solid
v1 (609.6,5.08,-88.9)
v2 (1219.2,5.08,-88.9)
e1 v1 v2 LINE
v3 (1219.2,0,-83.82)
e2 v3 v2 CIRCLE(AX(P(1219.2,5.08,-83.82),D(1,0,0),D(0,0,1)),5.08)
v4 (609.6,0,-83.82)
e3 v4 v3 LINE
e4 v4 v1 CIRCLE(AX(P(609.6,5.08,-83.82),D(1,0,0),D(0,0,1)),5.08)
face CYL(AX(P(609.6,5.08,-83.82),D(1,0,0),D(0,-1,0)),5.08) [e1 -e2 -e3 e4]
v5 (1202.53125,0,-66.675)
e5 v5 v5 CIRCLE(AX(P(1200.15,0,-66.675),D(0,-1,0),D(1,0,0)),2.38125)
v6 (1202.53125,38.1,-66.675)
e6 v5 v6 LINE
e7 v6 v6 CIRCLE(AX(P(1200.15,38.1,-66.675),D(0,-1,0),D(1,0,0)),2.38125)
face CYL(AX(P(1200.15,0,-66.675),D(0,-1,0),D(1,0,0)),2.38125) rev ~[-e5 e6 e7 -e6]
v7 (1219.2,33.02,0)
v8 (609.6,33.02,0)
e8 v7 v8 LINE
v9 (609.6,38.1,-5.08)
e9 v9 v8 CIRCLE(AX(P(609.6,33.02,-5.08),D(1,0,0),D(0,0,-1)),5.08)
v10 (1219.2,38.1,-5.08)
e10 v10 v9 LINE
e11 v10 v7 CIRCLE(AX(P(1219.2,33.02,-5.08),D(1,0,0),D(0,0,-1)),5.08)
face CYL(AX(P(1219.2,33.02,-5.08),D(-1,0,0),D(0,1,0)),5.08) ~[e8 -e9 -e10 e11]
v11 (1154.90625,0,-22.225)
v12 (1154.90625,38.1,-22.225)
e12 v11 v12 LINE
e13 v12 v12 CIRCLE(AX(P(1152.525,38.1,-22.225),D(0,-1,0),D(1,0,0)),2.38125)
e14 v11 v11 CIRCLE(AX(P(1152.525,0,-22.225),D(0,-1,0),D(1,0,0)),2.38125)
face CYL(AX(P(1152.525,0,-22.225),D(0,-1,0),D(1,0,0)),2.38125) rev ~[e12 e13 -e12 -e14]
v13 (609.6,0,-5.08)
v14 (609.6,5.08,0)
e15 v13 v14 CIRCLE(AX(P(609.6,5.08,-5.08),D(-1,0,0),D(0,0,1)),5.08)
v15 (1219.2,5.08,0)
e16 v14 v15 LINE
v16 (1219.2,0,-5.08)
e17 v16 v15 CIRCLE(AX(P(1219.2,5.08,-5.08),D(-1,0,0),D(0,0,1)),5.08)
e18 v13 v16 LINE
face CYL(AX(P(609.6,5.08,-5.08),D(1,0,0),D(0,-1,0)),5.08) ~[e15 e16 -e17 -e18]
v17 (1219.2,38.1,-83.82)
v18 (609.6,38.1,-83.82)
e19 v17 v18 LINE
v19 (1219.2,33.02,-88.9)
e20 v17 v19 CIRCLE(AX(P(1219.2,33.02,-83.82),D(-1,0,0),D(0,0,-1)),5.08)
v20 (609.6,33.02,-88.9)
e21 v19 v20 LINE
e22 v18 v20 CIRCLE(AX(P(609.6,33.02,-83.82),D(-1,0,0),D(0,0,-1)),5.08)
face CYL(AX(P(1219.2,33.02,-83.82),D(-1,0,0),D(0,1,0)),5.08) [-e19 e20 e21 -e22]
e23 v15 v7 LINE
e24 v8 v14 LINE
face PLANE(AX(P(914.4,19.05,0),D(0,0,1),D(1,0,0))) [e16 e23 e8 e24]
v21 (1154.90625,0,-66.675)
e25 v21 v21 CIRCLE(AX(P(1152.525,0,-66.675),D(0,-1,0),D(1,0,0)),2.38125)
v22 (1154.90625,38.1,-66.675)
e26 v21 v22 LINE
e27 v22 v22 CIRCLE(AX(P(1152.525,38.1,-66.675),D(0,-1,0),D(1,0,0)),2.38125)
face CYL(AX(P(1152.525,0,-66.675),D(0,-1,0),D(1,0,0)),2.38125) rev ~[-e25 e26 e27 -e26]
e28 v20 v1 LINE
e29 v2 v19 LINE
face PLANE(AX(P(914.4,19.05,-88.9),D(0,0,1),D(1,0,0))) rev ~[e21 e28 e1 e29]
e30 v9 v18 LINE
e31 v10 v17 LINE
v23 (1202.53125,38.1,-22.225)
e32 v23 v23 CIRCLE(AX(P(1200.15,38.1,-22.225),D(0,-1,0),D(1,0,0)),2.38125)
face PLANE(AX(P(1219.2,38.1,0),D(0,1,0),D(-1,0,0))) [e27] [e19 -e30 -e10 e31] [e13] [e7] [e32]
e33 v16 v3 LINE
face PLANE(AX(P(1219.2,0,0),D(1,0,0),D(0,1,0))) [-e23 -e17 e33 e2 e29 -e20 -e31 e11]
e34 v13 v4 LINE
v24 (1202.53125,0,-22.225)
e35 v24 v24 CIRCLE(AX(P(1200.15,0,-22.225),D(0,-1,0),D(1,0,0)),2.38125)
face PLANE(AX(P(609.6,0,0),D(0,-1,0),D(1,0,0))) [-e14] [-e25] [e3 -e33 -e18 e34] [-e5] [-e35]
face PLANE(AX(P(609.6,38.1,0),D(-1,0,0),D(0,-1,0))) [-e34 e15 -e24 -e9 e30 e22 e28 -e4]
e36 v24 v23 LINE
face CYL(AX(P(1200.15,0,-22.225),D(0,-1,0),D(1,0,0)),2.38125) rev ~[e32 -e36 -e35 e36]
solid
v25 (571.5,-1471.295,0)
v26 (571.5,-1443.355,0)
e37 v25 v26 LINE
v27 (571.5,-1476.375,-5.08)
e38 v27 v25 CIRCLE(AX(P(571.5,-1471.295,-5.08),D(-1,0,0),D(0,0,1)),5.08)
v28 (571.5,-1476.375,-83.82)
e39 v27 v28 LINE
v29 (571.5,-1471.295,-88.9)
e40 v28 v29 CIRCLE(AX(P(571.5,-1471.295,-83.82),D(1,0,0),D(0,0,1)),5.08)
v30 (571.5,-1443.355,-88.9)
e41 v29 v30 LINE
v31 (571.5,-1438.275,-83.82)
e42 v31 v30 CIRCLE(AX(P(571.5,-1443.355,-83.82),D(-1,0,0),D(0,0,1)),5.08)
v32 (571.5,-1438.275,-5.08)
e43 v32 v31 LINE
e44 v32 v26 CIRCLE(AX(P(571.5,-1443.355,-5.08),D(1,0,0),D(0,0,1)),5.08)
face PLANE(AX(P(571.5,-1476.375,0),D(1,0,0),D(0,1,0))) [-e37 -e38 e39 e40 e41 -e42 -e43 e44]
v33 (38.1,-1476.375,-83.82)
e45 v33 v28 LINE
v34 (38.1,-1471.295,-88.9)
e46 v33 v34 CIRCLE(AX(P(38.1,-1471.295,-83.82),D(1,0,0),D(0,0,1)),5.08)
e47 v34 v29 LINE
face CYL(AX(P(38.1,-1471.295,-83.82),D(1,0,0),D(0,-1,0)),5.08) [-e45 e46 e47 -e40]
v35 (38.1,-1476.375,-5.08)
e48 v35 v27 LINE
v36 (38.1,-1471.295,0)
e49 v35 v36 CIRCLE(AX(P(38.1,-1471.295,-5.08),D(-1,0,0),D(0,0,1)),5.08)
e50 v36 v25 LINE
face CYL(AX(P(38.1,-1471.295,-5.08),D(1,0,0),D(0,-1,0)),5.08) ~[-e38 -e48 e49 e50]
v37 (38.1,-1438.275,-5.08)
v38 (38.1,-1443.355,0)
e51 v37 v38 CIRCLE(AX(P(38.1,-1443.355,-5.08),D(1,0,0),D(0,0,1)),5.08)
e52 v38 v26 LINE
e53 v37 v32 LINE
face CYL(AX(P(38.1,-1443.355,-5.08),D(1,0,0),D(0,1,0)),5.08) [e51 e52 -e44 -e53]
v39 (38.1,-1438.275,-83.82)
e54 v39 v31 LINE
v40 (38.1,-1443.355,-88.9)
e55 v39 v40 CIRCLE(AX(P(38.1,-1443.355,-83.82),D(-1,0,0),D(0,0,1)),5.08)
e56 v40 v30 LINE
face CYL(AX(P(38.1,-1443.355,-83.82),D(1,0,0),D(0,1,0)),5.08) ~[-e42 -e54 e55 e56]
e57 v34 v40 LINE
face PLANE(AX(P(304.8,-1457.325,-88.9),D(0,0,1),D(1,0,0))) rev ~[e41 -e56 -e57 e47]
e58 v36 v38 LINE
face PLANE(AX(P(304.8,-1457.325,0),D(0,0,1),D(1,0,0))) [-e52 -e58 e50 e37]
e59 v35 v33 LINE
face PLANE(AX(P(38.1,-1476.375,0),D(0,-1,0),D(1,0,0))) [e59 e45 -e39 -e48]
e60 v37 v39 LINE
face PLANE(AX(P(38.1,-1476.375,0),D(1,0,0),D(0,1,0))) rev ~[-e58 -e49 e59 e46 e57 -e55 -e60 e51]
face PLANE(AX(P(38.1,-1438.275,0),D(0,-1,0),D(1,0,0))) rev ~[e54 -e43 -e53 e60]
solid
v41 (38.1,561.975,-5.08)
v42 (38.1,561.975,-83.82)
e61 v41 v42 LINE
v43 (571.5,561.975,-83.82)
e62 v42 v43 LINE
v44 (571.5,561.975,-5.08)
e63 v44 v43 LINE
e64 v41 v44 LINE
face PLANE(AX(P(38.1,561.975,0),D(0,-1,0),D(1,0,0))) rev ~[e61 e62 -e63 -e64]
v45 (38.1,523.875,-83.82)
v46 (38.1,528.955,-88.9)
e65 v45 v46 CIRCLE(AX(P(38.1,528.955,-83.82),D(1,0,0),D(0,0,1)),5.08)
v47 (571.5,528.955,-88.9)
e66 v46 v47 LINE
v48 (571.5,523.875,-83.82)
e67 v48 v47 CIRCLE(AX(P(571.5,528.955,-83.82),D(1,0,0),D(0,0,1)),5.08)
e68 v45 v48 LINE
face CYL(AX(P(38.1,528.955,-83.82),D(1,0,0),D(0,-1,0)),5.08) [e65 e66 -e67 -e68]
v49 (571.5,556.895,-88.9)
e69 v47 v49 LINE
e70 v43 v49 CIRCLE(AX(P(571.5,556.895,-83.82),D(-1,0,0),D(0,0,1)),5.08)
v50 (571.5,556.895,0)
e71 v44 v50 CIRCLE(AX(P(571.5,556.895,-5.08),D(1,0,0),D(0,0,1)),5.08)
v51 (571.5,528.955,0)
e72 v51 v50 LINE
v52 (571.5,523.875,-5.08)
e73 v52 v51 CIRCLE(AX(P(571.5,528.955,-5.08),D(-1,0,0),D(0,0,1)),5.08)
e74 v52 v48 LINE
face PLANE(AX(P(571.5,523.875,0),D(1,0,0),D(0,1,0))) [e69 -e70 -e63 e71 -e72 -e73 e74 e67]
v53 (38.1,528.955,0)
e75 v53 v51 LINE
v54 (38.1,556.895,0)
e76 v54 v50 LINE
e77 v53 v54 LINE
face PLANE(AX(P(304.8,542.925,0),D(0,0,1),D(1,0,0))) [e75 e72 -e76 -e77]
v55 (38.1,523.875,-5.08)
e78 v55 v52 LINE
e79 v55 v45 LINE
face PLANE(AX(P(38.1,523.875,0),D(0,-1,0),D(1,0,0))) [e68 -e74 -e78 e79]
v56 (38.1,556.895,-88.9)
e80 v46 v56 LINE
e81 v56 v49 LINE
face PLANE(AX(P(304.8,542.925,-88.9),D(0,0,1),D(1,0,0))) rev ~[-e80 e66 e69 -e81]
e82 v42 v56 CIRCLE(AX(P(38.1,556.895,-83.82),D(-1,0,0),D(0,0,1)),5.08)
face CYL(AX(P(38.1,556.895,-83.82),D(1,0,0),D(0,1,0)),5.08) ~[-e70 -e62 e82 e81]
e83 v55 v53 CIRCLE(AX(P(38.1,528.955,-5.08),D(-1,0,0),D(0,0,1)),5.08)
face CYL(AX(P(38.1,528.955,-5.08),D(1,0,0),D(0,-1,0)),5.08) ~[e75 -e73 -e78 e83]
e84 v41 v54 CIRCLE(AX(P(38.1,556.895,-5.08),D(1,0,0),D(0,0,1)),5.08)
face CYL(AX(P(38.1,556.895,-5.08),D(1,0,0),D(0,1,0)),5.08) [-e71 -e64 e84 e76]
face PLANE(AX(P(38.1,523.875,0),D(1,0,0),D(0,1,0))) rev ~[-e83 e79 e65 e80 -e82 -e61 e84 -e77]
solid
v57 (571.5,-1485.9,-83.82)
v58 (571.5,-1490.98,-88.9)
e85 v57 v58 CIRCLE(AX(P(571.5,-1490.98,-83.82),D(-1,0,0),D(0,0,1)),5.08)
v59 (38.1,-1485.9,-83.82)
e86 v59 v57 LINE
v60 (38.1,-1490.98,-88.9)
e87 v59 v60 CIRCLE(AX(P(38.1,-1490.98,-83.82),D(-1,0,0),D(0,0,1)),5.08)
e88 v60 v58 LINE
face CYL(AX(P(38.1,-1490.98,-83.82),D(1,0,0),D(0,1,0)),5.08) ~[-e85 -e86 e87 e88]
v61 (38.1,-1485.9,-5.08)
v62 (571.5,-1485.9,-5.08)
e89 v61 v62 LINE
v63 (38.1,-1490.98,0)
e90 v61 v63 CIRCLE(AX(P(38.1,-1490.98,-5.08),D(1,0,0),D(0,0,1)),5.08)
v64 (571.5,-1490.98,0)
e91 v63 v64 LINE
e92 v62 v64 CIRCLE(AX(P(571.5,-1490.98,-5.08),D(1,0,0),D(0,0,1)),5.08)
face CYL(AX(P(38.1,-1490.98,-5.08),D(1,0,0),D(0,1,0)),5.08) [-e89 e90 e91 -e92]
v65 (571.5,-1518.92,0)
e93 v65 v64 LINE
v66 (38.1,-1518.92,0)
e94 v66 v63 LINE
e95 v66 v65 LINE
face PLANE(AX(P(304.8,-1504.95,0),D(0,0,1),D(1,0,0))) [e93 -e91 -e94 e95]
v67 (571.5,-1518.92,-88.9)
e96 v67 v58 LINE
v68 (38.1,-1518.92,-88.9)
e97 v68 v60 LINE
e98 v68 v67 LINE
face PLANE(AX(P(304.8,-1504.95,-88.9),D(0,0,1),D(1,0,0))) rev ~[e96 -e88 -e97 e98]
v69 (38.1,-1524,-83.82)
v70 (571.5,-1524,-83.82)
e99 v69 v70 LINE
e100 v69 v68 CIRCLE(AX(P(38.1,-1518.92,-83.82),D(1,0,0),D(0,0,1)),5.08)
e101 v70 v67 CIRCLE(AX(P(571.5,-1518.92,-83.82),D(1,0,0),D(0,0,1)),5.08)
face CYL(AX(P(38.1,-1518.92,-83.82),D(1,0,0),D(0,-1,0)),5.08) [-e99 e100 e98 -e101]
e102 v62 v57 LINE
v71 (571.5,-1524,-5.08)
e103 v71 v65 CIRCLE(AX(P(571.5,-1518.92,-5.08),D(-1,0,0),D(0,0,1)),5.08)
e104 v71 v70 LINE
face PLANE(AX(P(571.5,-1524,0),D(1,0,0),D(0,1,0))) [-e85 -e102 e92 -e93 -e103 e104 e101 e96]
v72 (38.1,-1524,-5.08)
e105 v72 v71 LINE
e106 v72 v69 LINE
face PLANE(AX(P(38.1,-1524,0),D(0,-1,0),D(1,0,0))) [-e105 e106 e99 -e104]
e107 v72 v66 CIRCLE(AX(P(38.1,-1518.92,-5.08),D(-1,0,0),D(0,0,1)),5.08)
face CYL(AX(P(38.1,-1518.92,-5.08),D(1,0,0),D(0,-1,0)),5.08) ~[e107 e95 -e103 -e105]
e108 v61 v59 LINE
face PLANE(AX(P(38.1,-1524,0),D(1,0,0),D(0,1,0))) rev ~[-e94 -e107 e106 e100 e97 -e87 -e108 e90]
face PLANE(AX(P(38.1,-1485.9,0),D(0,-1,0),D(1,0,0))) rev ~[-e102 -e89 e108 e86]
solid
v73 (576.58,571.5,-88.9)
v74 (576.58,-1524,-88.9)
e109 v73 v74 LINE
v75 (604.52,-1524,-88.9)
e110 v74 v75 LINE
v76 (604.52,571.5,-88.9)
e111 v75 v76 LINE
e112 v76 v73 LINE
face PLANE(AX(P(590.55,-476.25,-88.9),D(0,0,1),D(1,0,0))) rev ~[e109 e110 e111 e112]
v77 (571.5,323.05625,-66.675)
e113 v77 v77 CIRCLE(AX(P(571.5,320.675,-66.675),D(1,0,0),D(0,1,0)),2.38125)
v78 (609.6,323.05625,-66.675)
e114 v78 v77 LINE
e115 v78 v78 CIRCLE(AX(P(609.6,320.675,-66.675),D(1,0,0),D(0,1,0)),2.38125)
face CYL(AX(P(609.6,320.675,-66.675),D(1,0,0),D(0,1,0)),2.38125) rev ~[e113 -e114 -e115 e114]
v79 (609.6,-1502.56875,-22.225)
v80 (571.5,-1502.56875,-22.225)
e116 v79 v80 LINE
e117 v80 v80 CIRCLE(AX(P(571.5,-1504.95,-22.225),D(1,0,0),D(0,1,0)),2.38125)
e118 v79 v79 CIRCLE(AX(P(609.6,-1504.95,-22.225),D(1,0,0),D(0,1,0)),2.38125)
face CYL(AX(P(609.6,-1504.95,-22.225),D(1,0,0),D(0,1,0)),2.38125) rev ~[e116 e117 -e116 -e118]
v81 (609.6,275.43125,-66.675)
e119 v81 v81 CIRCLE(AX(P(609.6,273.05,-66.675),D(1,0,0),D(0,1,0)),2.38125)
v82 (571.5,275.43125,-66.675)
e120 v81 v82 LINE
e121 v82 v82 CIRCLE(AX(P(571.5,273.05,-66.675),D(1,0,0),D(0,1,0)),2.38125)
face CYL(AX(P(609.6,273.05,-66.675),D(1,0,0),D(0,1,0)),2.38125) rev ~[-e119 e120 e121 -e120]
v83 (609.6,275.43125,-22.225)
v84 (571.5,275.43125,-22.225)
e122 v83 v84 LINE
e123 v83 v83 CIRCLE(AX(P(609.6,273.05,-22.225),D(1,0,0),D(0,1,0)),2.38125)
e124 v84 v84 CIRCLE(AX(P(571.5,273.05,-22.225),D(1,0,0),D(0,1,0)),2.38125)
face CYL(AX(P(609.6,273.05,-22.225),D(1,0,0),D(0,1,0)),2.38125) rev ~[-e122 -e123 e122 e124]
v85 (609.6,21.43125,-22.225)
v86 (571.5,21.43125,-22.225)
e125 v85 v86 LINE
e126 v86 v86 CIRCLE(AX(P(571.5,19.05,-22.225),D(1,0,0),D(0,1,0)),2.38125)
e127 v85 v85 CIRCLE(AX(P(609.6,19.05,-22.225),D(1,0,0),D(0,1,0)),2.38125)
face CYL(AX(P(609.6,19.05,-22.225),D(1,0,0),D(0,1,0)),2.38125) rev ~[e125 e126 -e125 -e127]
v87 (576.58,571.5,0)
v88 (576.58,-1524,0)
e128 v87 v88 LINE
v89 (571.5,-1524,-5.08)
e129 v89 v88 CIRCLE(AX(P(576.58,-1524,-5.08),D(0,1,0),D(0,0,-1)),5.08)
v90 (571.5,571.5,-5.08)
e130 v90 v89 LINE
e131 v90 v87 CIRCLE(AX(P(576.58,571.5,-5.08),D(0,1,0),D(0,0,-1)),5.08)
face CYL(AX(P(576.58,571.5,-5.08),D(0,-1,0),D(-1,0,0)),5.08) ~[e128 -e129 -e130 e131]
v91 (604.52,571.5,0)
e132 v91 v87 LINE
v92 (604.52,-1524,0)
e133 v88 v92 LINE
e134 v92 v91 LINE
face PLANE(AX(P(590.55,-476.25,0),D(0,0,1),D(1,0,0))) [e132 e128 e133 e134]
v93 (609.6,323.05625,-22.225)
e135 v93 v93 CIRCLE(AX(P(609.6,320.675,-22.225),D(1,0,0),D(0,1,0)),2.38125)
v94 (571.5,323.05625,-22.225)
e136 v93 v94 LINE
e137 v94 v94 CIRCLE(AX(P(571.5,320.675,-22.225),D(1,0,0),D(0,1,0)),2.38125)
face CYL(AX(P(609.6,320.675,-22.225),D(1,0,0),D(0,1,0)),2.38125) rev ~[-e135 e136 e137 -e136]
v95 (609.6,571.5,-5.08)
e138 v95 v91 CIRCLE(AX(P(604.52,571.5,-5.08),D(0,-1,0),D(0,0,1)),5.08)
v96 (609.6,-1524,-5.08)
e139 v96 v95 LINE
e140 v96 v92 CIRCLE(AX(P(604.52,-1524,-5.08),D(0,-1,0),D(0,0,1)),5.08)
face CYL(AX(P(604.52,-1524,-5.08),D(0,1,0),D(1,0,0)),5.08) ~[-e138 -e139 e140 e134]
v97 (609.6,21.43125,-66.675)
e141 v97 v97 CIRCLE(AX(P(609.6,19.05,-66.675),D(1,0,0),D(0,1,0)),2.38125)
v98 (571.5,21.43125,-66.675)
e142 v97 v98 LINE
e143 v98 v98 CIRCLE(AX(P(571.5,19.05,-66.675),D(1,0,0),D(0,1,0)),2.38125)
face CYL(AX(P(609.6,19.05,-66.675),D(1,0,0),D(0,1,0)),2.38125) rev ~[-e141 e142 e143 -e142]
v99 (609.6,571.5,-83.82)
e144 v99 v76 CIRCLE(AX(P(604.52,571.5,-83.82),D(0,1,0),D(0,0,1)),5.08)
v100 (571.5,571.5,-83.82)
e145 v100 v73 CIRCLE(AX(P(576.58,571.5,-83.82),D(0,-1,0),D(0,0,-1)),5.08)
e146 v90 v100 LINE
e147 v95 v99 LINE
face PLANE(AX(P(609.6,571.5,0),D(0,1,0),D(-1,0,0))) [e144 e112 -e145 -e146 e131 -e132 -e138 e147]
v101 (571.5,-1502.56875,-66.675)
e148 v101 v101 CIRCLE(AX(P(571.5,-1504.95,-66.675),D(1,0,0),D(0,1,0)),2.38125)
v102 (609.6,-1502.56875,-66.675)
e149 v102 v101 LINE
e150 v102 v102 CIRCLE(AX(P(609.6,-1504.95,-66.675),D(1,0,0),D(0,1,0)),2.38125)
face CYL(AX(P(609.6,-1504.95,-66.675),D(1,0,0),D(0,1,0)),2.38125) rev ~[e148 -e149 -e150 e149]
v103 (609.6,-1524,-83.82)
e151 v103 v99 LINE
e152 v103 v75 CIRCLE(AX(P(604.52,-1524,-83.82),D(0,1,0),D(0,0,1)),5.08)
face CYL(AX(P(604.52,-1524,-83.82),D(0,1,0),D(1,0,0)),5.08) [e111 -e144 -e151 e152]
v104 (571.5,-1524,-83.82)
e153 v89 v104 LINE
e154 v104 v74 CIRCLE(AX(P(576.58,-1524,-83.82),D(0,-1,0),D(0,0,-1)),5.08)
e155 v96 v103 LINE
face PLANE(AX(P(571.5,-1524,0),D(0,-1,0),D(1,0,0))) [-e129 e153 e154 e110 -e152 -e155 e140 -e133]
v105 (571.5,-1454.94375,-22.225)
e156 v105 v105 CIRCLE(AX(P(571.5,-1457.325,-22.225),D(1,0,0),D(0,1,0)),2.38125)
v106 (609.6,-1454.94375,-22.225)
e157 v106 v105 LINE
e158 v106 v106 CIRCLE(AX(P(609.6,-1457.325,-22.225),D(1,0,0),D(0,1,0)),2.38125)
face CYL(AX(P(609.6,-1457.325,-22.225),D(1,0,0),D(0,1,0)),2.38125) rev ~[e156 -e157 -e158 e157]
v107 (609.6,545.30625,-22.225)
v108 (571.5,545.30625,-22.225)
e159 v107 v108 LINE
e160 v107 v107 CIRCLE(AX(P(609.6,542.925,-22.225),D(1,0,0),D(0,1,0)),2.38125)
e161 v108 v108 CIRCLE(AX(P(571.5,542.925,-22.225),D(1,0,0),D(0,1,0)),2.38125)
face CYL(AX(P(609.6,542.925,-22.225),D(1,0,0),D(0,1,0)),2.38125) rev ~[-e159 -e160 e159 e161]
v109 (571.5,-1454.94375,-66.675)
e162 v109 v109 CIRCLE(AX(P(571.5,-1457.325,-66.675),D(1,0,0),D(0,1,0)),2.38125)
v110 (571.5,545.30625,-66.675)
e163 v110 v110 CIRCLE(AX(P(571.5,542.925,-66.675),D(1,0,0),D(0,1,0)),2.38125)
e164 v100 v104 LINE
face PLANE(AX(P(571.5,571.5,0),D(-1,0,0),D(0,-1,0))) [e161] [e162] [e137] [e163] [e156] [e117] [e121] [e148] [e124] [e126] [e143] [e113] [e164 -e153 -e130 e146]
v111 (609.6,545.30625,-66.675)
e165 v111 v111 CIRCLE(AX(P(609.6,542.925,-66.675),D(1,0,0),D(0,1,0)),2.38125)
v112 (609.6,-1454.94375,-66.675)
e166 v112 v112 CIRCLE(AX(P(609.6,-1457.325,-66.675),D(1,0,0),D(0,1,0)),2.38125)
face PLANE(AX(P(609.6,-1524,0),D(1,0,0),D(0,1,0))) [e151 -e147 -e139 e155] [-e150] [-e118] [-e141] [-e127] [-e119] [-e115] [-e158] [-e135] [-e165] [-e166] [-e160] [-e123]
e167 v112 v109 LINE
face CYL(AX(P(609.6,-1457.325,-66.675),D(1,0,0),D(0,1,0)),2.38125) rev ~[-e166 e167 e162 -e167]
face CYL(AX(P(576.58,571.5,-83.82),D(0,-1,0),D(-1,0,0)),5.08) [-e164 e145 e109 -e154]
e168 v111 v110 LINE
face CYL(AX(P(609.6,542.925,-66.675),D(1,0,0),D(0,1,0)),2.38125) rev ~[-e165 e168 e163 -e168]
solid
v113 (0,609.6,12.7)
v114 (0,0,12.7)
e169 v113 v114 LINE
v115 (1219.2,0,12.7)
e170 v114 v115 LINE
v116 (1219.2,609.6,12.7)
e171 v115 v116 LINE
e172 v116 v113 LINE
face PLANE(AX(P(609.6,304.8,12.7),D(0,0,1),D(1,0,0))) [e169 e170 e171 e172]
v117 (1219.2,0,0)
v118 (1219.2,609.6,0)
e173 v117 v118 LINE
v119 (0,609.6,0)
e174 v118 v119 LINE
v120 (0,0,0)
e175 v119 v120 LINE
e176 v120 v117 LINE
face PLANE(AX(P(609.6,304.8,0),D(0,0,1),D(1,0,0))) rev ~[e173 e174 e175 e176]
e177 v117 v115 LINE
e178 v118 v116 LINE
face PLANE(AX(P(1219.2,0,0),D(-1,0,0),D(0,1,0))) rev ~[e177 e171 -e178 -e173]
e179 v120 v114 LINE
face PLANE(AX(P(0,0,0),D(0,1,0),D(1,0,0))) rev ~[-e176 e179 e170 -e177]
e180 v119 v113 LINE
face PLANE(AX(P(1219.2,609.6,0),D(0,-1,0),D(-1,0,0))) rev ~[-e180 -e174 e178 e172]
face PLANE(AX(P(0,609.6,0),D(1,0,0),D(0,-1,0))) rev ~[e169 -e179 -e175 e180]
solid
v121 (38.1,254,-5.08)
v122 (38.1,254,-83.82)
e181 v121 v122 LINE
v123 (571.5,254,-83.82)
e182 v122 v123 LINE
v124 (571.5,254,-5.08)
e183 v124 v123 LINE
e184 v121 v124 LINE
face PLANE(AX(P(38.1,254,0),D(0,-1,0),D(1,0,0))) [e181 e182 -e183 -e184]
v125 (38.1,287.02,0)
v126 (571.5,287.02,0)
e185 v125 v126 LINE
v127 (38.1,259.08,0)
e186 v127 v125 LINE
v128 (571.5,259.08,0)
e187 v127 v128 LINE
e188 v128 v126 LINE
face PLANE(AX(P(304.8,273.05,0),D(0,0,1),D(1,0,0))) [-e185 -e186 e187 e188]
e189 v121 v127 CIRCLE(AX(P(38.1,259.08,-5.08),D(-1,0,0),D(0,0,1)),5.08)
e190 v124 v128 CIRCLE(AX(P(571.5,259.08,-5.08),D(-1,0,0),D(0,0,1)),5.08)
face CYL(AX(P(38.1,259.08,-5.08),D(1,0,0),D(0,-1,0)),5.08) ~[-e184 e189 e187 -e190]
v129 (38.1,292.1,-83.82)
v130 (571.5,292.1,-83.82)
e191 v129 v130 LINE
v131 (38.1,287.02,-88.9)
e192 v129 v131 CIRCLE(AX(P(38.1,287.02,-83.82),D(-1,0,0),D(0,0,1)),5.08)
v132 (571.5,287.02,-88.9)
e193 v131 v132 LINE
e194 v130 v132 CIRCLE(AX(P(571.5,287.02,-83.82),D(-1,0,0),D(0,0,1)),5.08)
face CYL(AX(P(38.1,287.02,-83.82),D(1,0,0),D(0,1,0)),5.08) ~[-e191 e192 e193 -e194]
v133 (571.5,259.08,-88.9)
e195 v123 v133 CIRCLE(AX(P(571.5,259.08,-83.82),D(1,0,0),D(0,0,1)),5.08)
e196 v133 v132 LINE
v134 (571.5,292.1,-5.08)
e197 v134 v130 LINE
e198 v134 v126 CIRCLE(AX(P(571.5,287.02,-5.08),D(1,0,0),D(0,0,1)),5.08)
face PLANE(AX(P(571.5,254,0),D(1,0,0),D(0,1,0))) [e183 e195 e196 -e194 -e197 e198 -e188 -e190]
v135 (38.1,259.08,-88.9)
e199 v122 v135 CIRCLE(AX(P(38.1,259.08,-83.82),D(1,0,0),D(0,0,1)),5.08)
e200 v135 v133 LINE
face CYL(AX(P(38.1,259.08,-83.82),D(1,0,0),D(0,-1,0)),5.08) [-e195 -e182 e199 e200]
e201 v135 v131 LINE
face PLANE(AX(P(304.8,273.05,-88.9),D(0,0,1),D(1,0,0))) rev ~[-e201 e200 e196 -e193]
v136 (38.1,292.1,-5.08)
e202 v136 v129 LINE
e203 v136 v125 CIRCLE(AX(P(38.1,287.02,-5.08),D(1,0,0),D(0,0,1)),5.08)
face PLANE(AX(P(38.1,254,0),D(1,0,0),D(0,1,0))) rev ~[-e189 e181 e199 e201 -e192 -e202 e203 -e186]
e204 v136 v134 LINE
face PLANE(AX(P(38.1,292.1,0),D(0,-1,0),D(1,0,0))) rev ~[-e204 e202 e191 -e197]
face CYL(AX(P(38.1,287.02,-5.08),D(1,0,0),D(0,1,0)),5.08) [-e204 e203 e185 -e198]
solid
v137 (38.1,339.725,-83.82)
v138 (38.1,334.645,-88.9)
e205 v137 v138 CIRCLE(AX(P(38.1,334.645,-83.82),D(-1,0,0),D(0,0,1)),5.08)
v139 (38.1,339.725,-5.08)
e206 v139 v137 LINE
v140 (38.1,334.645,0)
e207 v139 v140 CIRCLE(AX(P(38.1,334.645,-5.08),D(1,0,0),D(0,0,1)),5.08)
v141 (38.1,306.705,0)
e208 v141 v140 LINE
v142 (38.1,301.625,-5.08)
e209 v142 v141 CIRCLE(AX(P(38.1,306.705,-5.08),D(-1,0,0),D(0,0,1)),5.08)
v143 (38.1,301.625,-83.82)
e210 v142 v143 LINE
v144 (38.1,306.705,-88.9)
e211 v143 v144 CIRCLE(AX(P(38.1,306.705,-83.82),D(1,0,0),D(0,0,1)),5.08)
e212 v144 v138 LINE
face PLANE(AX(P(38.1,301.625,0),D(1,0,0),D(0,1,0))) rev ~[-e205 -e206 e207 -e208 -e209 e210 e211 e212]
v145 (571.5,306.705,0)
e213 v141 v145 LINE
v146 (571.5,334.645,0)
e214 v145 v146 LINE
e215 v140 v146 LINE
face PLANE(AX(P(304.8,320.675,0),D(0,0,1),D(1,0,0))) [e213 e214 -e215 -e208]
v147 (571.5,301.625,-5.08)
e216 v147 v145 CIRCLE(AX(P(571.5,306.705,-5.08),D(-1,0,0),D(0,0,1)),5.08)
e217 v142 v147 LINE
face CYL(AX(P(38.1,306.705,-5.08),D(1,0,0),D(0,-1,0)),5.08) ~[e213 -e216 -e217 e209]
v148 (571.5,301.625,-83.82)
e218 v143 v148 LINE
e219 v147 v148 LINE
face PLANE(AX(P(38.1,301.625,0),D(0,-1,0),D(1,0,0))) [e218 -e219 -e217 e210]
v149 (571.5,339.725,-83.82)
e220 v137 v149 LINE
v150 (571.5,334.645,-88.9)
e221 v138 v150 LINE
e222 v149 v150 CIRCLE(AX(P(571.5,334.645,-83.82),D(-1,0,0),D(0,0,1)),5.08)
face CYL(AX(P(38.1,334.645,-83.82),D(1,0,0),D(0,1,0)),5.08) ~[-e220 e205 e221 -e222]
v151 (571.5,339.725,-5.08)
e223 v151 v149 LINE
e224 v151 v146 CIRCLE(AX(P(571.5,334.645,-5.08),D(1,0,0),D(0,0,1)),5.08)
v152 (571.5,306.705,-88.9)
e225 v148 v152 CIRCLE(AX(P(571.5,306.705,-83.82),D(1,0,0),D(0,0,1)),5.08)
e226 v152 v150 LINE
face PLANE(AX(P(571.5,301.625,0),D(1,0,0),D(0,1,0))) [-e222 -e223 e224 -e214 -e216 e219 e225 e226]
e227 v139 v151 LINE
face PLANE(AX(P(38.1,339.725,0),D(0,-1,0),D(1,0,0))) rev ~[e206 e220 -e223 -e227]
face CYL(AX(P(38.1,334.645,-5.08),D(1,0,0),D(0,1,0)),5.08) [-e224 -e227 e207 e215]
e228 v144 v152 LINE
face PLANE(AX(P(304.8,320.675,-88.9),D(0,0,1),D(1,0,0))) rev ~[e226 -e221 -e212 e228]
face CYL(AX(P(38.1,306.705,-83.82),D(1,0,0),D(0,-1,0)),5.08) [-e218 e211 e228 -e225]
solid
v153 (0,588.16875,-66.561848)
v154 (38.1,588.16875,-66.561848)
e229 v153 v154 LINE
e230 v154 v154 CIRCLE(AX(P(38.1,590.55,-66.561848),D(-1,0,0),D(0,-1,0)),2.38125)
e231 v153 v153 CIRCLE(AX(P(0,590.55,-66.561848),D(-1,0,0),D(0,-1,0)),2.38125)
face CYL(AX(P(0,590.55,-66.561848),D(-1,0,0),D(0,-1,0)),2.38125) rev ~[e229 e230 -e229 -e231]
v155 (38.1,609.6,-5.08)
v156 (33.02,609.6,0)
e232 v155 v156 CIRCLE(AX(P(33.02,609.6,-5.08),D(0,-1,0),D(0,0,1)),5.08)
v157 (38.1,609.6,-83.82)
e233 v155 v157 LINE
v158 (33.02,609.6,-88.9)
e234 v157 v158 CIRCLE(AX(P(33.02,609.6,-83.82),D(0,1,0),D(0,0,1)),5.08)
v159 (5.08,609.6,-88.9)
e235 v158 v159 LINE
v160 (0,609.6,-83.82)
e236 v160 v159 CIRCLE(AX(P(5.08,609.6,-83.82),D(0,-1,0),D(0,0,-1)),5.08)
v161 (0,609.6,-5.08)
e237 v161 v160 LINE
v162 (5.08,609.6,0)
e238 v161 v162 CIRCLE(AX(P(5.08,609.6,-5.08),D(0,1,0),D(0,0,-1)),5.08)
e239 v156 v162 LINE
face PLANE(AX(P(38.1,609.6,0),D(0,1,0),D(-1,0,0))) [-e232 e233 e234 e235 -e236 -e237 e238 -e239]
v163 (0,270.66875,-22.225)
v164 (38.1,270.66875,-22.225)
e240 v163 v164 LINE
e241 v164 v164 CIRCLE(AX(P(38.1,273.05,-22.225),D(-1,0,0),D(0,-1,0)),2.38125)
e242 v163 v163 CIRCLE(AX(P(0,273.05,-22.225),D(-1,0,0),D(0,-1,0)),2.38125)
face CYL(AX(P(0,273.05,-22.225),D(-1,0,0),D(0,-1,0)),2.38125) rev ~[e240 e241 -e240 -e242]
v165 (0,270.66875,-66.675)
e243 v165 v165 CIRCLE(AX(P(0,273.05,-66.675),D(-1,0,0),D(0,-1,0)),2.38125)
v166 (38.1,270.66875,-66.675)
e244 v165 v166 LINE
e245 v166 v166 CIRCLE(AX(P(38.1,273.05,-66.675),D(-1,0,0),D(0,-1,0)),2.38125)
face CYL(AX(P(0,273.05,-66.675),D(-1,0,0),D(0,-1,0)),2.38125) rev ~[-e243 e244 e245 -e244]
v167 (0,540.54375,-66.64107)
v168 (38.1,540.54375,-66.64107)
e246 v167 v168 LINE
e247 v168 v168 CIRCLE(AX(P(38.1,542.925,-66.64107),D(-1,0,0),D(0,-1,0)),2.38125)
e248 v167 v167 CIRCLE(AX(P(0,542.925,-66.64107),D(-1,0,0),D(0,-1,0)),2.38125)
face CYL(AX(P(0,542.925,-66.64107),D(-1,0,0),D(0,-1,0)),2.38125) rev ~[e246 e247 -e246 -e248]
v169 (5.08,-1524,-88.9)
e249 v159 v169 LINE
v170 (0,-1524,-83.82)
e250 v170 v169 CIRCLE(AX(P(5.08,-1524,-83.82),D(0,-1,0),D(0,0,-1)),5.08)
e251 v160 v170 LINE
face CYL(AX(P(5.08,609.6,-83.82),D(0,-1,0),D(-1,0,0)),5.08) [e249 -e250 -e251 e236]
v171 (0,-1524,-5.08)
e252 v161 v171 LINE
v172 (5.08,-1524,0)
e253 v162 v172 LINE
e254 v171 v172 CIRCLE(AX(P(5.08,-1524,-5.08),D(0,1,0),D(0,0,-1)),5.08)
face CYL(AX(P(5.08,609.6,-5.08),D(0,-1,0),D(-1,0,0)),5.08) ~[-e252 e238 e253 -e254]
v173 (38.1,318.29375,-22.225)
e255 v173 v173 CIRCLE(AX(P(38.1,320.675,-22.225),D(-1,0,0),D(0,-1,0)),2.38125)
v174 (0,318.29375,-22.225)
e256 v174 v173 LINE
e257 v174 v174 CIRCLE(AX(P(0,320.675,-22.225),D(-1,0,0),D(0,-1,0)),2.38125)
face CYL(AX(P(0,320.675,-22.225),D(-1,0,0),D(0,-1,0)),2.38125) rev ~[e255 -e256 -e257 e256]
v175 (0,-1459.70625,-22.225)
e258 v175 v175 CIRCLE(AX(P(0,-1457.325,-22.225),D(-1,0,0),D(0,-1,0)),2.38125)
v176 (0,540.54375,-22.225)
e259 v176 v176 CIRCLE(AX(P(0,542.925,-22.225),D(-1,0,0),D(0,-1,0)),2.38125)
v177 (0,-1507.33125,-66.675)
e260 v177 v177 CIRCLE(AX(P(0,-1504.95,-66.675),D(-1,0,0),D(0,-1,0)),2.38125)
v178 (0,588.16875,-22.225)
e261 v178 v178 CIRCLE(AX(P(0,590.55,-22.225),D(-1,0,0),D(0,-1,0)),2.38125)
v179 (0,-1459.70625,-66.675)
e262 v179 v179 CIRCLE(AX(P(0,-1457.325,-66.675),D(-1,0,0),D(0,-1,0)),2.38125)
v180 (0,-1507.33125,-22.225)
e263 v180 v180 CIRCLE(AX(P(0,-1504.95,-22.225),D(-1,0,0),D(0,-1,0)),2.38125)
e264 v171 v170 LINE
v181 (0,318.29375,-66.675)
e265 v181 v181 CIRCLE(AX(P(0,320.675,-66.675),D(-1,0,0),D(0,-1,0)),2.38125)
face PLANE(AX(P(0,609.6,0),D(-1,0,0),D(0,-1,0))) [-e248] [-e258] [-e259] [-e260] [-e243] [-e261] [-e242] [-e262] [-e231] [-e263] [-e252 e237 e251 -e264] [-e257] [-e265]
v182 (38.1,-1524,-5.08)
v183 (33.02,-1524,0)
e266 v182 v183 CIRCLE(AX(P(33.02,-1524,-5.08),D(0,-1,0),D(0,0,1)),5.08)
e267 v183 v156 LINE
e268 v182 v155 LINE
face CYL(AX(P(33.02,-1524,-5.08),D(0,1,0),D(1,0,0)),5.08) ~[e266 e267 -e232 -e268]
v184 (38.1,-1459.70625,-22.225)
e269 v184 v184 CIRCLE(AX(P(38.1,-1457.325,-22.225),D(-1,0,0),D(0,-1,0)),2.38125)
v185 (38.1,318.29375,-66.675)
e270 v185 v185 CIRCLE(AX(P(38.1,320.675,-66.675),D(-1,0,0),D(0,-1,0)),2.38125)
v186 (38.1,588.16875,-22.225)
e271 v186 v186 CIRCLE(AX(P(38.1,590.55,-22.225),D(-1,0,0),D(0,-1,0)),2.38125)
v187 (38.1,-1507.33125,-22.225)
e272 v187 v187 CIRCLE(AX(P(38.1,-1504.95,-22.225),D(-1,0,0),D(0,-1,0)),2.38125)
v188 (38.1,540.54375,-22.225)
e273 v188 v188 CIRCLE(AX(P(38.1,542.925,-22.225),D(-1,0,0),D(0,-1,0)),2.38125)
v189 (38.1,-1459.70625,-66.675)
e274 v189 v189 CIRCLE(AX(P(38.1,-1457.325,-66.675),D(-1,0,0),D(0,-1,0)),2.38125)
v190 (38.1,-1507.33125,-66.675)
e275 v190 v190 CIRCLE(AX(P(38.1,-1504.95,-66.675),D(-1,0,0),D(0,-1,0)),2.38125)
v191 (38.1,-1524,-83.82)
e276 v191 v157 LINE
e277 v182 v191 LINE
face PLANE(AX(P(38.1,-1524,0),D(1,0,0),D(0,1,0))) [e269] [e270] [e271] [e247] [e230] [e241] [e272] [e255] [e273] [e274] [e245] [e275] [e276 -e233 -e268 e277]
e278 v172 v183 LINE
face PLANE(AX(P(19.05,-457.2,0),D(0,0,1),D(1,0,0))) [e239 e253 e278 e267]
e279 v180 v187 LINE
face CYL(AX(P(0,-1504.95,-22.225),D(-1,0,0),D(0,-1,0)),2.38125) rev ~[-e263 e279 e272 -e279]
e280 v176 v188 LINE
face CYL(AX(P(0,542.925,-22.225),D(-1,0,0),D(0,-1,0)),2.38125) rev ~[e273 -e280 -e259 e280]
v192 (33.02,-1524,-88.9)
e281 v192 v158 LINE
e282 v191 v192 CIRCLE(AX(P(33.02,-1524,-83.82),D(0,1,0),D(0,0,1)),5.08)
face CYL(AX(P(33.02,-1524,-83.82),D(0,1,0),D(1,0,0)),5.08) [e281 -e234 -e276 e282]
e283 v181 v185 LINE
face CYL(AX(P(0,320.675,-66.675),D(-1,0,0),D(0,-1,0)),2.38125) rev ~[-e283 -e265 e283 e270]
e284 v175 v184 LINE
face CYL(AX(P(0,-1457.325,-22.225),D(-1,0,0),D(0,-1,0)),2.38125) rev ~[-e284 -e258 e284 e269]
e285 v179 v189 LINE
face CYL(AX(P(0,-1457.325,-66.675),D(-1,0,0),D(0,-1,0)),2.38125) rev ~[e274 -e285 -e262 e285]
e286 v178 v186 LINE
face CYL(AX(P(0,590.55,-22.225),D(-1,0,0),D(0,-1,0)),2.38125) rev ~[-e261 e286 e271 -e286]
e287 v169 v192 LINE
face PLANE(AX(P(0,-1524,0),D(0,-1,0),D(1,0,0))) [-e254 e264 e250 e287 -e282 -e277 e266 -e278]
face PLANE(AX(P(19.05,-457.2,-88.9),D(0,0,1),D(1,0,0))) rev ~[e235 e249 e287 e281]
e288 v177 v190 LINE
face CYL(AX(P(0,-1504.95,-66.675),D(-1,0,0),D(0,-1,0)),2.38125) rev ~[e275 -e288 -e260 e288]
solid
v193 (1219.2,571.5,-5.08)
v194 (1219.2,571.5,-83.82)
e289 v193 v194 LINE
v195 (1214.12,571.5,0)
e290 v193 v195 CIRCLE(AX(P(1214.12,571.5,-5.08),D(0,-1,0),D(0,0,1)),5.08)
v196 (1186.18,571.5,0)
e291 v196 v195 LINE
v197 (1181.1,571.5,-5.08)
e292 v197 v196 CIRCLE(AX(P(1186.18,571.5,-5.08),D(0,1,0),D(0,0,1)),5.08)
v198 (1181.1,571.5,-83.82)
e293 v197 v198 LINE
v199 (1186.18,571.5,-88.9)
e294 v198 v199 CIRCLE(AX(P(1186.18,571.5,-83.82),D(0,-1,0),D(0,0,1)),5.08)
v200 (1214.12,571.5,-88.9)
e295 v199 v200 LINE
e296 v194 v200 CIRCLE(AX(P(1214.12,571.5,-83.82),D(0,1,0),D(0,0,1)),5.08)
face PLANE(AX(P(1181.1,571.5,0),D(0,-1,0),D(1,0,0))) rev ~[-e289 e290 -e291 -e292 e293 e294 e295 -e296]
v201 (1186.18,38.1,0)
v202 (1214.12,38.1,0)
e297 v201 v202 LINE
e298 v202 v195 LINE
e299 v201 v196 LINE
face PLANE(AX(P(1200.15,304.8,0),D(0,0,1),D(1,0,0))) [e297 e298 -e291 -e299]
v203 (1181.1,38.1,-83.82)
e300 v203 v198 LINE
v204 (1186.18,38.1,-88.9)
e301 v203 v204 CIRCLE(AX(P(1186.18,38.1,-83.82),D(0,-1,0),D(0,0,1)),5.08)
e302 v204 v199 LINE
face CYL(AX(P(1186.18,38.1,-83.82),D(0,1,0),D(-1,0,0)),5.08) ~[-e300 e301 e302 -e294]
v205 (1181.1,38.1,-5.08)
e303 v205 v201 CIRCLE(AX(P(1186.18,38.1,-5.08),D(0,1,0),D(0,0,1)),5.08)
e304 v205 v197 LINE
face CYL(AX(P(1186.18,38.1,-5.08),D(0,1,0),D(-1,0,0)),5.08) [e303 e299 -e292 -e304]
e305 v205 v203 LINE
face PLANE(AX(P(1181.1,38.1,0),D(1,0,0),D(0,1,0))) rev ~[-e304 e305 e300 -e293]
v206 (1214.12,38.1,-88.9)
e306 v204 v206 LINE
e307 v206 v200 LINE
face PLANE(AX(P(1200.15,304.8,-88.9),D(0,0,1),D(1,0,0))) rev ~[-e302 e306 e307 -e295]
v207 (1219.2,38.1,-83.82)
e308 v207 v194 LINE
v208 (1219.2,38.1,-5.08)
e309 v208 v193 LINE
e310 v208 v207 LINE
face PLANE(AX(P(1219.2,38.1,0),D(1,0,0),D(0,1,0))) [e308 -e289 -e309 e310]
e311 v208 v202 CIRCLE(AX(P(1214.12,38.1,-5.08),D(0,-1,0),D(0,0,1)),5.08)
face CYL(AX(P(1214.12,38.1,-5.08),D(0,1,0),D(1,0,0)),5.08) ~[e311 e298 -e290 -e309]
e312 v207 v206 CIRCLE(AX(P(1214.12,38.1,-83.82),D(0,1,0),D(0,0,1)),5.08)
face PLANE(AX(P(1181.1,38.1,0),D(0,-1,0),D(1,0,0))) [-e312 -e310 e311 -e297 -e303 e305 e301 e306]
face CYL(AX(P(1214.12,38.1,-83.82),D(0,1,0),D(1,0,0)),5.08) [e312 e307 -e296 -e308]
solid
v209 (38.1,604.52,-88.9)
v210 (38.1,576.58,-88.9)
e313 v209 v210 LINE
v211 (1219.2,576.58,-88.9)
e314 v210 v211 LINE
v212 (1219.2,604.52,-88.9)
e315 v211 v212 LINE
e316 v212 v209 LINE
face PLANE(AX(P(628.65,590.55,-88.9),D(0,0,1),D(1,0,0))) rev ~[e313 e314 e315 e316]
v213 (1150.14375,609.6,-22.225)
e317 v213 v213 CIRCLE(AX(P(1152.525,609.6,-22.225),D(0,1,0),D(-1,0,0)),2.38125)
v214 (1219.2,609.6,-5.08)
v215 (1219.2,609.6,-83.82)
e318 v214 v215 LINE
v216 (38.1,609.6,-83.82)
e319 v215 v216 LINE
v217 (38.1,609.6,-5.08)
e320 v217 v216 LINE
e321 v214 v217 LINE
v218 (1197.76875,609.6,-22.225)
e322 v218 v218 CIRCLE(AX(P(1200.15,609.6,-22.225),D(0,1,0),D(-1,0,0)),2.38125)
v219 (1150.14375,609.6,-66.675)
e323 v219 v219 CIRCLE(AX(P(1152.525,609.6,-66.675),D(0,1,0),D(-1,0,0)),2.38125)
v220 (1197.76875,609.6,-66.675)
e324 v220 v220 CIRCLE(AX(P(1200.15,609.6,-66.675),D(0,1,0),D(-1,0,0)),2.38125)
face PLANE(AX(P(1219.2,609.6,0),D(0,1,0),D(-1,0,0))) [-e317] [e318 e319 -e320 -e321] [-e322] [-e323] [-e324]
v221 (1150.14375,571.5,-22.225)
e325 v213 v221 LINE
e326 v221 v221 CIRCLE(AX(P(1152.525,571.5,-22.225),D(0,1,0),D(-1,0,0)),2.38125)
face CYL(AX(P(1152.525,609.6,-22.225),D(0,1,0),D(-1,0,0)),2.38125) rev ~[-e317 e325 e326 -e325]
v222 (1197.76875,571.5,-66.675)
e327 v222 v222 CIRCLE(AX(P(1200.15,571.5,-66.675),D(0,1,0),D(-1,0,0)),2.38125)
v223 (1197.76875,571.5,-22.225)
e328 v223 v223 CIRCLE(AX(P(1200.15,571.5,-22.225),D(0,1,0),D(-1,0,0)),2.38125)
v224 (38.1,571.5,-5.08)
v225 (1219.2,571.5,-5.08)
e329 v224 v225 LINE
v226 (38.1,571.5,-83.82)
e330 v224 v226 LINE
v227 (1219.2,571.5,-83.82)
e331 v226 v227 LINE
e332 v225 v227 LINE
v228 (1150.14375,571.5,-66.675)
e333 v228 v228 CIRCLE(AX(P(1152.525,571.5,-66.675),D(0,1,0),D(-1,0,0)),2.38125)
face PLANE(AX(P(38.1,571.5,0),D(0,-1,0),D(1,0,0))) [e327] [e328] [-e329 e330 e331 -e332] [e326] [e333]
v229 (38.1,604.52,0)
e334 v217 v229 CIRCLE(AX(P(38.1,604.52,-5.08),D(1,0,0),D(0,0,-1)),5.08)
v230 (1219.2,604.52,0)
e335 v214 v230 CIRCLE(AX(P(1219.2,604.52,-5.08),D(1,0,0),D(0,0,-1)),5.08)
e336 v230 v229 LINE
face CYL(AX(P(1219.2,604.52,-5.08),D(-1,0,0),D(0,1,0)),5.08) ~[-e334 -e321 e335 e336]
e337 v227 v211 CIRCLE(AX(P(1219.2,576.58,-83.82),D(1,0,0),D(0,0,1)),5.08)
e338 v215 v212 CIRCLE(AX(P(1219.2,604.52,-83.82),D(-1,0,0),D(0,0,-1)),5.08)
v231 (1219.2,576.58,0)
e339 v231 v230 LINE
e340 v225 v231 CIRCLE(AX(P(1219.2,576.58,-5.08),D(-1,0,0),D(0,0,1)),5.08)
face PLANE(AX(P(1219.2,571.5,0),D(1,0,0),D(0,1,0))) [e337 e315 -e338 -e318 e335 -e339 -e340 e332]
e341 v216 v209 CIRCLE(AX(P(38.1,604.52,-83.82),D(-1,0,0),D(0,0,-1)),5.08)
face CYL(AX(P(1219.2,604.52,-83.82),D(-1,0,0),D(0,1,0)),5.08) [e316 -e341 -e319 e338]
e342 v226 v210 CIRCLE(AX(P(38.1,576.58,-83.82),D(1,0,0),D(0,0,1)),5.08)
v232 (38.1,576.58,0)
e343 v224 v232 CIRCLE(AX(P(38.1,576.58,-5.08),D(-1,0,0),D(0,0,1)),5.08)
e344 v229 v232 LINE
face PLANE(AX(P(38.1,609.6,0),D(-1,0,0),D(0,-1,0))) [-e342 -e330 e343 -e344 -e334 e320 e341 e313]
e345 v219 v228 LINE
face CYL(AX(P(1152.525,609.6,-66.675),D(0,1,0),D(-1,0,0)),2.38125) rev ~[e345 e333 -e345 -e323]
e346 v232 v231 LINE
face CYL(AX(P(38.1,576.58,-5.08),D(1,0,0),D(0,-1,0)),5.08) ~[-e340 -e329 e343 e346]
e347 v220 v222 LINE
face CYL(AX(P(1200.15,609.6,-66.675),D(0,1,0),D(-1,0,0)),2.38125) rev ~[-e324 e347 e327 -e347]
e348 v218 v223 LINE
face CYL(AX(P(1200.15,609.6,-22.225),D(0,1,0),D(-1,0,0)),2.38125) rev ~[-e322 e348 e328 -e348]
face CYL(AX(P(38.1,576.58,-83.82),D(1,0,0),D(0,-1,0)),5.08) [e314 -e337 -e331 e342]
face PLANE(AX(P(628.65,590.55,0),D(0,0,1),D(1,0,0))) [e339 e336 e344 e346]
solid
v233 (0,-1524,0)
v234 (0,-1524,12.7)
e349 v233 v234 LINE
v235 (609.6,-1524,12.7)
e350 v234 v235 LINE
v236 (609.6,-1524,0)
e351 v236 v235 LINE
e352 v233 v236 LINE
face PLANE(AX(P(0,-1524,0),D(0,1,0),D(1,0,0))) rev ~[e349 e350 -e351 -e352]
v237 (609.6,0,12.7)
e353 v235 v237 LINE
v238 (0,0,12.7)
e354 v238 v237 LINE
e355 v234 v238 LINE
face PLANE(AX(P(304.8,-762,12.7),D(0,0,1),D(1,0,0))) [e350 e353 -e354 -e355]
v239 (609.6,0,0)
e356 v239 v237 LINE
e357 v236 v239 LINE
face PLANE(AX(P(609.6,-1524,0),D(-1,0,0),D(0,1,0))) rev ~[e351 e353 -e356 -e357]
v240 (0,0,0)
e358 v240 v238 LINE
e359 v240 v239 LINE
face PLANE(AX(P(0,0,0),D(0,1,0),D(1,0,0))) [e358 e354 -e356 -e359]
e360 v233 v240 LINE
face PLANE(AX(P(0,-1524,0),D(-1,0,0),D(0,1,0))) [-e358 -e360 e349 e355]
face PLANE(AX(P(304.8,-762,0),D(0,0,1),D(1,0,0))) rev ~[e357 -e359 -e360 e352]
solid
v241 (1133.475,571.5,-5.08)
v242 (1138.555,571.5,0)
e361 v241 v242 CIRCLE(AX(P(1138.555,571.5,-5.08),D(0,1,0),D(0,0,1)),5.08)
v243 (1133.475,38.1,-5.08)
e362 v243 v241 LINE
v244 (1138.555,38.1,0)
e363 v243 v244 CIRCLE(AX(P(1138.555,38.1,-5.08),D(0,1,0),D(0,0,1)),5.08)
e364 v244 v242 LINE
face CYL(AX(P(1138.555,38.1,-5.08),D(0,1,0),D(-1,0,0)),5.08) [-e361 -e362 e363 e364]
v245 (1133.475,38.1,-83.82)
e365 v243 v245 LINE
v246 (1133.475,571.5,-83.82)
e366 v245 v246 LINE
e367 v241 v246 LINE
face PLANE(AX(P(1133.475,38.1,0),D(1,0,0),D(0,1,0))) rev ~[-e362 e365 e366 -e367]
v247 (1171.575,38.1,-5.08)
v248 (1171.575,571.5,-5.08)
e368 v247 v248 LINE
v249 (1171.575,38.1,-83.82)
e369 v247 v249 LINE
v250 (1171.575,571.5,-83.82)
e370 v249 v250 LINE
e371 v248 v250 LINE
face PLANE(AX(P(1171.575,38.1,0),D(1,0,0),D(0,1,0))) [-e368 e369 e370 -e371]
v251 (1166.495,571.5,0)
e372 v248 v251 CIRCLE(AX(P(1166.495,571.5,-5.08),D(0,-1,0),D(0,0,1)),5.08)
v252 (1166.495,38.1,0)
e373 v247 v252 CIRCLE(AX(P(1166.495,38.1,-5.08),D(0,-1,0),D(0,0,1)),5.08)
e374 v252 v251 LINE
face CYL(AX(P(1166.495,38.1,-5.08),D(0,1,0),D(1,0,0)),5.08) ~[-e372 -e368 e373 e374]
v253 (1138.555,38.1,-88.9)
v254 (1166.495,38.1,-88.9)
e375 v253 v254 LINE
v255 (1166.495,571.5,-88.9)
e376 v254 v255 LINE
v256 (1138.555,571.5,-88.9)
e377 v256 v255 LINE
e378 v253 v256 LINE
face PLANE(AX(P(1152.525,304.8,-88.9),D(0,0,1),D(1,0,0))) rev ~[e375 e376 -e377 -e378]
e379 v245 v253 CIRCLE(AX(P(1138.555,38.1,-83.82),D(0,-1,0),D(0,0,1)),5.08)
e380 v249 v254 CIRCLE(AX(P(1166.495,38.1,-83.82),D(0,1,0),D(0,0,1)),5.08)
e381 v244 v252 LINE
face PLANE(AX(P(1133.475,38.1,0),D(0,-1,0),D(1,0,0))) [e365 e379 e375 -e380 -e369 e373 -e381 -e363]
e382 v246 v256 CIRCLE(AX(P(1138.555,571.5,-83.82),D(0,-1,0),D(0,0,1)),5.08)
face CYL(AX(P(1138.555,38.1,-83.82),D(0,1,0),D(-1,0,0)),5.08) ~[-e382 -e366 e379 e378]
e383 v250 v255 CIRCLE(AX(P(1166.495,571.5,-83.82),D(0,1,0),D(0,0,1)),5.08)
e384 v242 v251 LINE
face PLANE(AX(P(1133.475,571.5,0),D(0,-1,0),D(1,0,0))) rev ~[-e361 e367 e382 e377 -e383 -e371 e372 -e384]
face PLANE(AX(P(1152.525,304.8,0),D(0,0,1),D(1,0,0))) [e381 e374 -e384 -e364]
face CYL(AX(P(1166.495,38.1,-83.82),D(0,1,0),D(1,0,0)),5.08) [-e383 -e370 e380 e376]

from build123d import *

# Parameters (mm, degrees)
F1_DEPTH  = 12.7
F2_W      = 609.6
F2_H      = 1524
F3_DEPTH  = 12.7
F5_DEPTH  = 88.9
F4_W      = 533.4
F4_H      = 38.1
F6_DEPTH  = 88.9
F7_DEPTH  = 88.9
F8_DEPTH  = 88.9
F9_DEPTH  = 88.9
F10_DEPTH = 88.9
F4_W_2    = 38.1
F4_H_2    = 533.4
F11_DEPTH = 88.9
F12_DEPTH = 88.9
F13_DEPTH = 88.9
F14_DEPTH = 88.9
F15_DEPTH = 88.9
F16_R     = 5.08
F16_2_R   = 5.08
F16_3_R   = 5.08
F16_4_R   = 5.08
F16_5_R   = 5.08
F16_6_R   = 5.08
F16_7_R   = 5.08
F16_8_R   = 5.08
F16_9_R   = 5.08
F16_10_R  = 5.08
F16_11_R  = 5.08
F17_R     = 2.38125
F19_DEPTH = 38.1
F18_R     = 2.38125
F20_DEPTH = 38.1
F21_R     = 2.38125
F22_DEPTH = 38.1
F23_R     = 2.38125
F24_DEPTH = 38.1


with BuildPart() as f1:
    # F0 (on Top) → F1 (new body)
    with BuildSketch(Plane.XY):
        Polygon((0, 609.6), (0, 0), (609.6, 0), (1219.2, 0), (1219.2, 609.6), align=None)
    extrude(amount=F1_DEPTH)


with BuildPart() as f3:
    # F2 (on Top) → F3 (new body)
    with BuildSketch(Plane.XY):
        with Locations((304.8, -762)):
            Rectangle(F2_W, F2_H)
    extrude(amount=F3_DEPTH)


with BuildPart() as f5:
    # F4 (on Top) → F5 (new body)
    with BuildSketch(Plane.XY):
        Polygon((38.1, 571.5), (38.1, 609.6), (0, 609.6), (0, -1524), (38.1, -1524), (38.1, -1485.9), (38.1, -1476.375), (38.1, -1438.275), (38.1, 254), (38.1, 292.1), (38.1, 301.625), (38.1, 339.725), (38.1, 523.875), (38.1, 561.975), align=None)
    extrude(amount=-F5_DEPTH)

    # F16
    f16_edges = [f5.edges().sort_by_distance(p)[0] for p in [
        (0, -457.2, -88.9),
        (38.1, -457.2, -88.9),
        (38.1, -457.2, 0),
        (0, -457.2, 0),
    ]]
    fillet(f16_edges, radius=F16_R)

    # F17 (on face) → F19 (cut)
    with BuildSketch(Plane(origin=(0, 0, 0), x_dir=(0, -1, 0), z_dir=(-1, 0, 0))):
        with Locations((-590.55, -22.225)):
            Circle(F17_R)
        with Locations((-590.55, -66.5618479609)):
            Circle(F17_R)
        with Locations((-542.925, -66.6410699844)):
            Circle(F17_R)
        with Locations((-542.925, -22.225)):
            Circle(F17_R)
        with Locations((-320.675, -22.225)):
            Circle(F17_R)
        with Locations((-320.675, -66.675)):
            Circle(F17_R)
        with Locations((-273.05, -22.225)):
            Circle(F17_R)
        with Locations((-273.05, -66.675)):
            Circle(F17_R)
        with Locations((1457.325, -66.675)):
            Circle(F17_R)
        with Locations((1457.325, -22.225)):
            Circle(F17_R)
        with Locations((1504.95, -22.225)):
            Circle(F17_R)
        with Locations((1504.95, -66.675)):
            Circle(F17_R)
    extrude(amount=-F19_DEPTH, mode=Mode.SUBTRACT)


with BuildPart() as f6:
    # F4 (on Top) → F6 (new body)
    with BuildSketch(Plane.XY):
        with Locations((304.8, -1504.95)):
            Rectangle(F4_W, F4_H)
    extrude(amount=-F6_DEPTH)

    # F16#3
    f16_3_edges = [f6.edges().sort_by_distance(p)[0] for p in [
        (304.8, -1485.9, 0),
        (304.8, -1524, 0),
        (304.8, -1485.9, -88.9),
        (304.8, -1524, -88.9),
    ]]
    fillet(f16_3_edges, radius=F16_3_R)


with BuildPart() as f7:
    # F4 (on Top) → F7 (new body)
    with BuildSketch(Plane.XY):
        Polygon((609.6, 571.5), (571.5, 571.5), (571.5, 561.975), (571.5, 523.875), (571.5, 339.725), (571.5, 301.625), (571.5, 292.1), (571.5, 254), (571.5, -1438.275), (571.5, -1476.375), (571.5, -1485.9), (571.5, -1524), (609.6, -1524), (609.6, 0), (609.6, 38.1), align=None)
    extrude(amount=-F7_DEPTH)

    # F16#2
    f16_2_edges = [f7.edges().sort_by_distance(p)[0] for p in [
        (571.5, -476.25, -88.9),
        (609.6, -476.25, -88.9),
        (571.5, -476.25, 0),
        (609.6, -476.25, 0),
    ]]
    fillet(f16_2_edges, radius=F16_2_R)

    # F18 (on face) → F20 (cut)
    with BuildSketch(Plane.YZ.offset(609.6)):
        with Locations((-1457.325, -22.225)):
            Circle(F18_R)
        with Locations((-1504.95, -22.225)):
            Circle(F18_R)
        with Locations((-1504.95, -66.675)):
            Circle(F18_R)
        with Locations((-1457.325, -66.675)):
            Circle(F18_R)
        with Locations((273.05, -22.225)):
            Circle(F18_R)
        with Locations((273.05, -66.675)):
            Circle(F18_R)
        with Locations((320.675, -22.225)):
            Circle(F18_R)
        with Locations((320.675, -66.675)):
            Circle(F18_R)
        with Locations((542.925, -22.225)):
            Circle(F18_R)
        with Locations((542.925, -66.675)):
            Circle(F18_R)
        with Locations((19.05, -22.225)):
            Circle(F18_R)
        with Locations((19.05, -66.675)):
            Circle(F18_R)
    extrude(amount=-F20_DEPTH, mode=Mode.SUBTRACT)


with BuildPart() as f8:
    # F4 (on Top) → F8 (new body)
    with BuildSketch(Plane.XY):
        Polygon((1219.2, 0), (1219.2, 38.1), (1181.1, 38.1), (1171.575, 38.1), (1133.475, 38.1), (609.6, 38.1), (609.6, 0), align=None)
    extrude(amount=-F8_DEPTH)

    # F16#5
    f16_5_edges = [f8.edges().sort_by_distance(p)[0] for p in [
        (914.4, 38.1, -88.9),
        (914.4, 0, -88.9),
        (914.4, 38.1, 0),
        (914.4, 0, 0),
    ]]
    fillet(f16_5_edges, radius=F16_5_R)

    # F21 (on face) → F22 (cut)
    with BuildSketch(Plane.XZ):
        with Locations((1200.15, -66.675)):
            Circle(F21_R)
        with Locations((1200.15, -22.225)):
            Circle(F21_R)
        with Locations((1152.525, -22.225)):
            Circle(F21_R)
        with Locations((1152.525, -66.675)):
            Circle(F21_R)
    extrude(amount=-F22_DEPTH, mode=Mode.SUBTRACT)


with BuildPart() as f9:
    # F4 (on Top) → F9 (new body)
    with BuildSketch(Plane.XY):
        with Locations((304.8, 273.05)):
            Rectangle(F4_W, F4_H)
    extrude(amount=-F9_DEPTH)

    # F16#4
    f16_4_edges = [f9.edges().sort_by_distance(p)[0] for p in [
        (304.8, 254, -88.9),
        (304.8, 292.1, 0),
        (304.8, 292.1, -88.9),
        (304.8, 254, 0),
    ]]
    fillet(f16_4_edges, radius=F16_4_R)


with BuildPart() as f10:
    # F4 (on Top) → F10 (new body)
    with BuildSketch(Plane.XY):
        Polygon((1219.2, 609.6), (38.1, 609.6), (38.1, 571.5), (571.5, 571.5), (609.6, 571.5), (1133.475, 571.5), (1171.575, 571.5), (1181.1, 571.5), (1219.2, 571.5), align=None)
    extrude(amount=-F10_DEPTH)

    # F16#7
    f16_7_edges = [f10.edges().sort_by_distance(p)[0] for p in [
        (628.65, 571.5, -88.9),
        (628.65, 609.6, -88.9),
        (628.65, 609.6, 0),
        (628.65, 571.5, 0),
    ]]
    fillet(f16_7_edges, radius=F16_7_R)

    # F23 (on face) → F24 (cut)
    with BuildSketch(Plane(origin=(0, 609.6, 0), x_dir=(-1, 0, 0), z_dir=(0, 1, 0))):
        with Locations((-1200.15, -22.225)):
            Circle(F23_R)
        with Locations((-1200.15, -66.675)):
            Circle(F23_R)
        with Locations((-1152.525, -22.225)):
            Circle(F23_R)
        with Locations((-1152.525, -66.675)):
            Circle(F23_R)
    extrude(amount=-F24_DEPTH, mode=Mode.SUBTRACT)


with BuildPart() as f11:
    # F4 (on Top) → F11 (new body)
    with BuildSketch(Plane.XY):
        with Locations((1200.15, 304.8)):
            Rectangle(F4_W_2, F4_H_2)
    extrude(amount=-F11_DEPTH)

    # F16#6
    f16_6_edges = [f11.edges().sort_by_distance(p)[0] for p in [
        (1219.2, 304.8, -88.9),
        (1181.1, 304.8, -88.9),
        (1181.1, 304.8, 0),
        (1219.2, 304.8, 0),
    ]]
    fillet(f16_6_edges, radius=F16_6_R)


with BuildPart() as f12:
    # F4 (on Top) → F12 (new body)
    with BuildSketch(Plane.XY):
        with Locations((304.8, 320.675)):
            Rectangle(F4_W, F4_H)
    extrude(amount=-F12_DEPTH)

    # F16#8
    f16_8_edges = [f12.edges().sort_by_distance(p)[0] for p in [
        (304.8, 339.725, -88.9),
        (304.8, 301.625, -88.9),
        (304.8, 339.725, 0),
        (304.8, 301.625, 0),
    ]]
    fillet(f16_8_edges, radius=F16_8_R)


with BuildPart() as f13:
    # F4 (on Top) → F13 (new body)
    with BuildSketch(Plane.XY):
        with Locations((304.8, -1457.325)):
            Rectangle(F4_W, F4_H)
    extrude(amount=-F13_DEPTH)

    # F16#10
    f16_10_edges = [f13.edges().sort_by_distance(p)[0] for p in [
        (304.8, -1438.275, -88.9),
        (304.8, -1476.375, -88.9),
        (304.8, -1476.375, 0),
        (304.8, -1438.275, 0),
    ]]
    fillet(f16_10_edges, radius=F16_10_R)


with BuildPart() as f14:
    # F4 (on Top) → F14 (new body)
    with BuildSketch(Plane.XY):
        with Locations((304.8, 542.925)):
            Rectangle(F4_W, F4_H)
    extrude(amount=-F14_DEPTH)

    # F16#9
    f16_9_edges = [f14.edges().sort_by_distance(p)[0] for p in [
        (304.8, 523.875, -88.9),
        (304.8, 561.975, -88.9),
        (304.8, 523.875, 0),
        (304.8, 561.975, 0),
    ]]
    fillet(f16_9_edges, radius=F16_9_R)


with BuildPart() as f15:
    # F4 (on Top) → F15 (new body)
    with BuildSketch(Plane.XY):
        with Locations((1152.525, 304.8)):
            Rectangle(F4_W_2, F4_H_2)
    extrude(amount=-F15_DEPTH)

    # F16#11
    f16_11_edges = [f15.edges().sort_by_distance(p)[0] for p in [
        (1133.475, 304.8, -88.9),
        (1171.575, 304.8, -88.9),
        (1171.575, 304.8, 0),
        (1133.475, 304.8, 0),
    ]]
    fillet(f16_11_edges, radius=F16_11_R)


solid = Compound([f1.part, f3.part, f5.part, f6.part, f7.part, f8.part, f9.part, f10.part, f11.part, f12.part, f13.part, f14.part, f15.part])
